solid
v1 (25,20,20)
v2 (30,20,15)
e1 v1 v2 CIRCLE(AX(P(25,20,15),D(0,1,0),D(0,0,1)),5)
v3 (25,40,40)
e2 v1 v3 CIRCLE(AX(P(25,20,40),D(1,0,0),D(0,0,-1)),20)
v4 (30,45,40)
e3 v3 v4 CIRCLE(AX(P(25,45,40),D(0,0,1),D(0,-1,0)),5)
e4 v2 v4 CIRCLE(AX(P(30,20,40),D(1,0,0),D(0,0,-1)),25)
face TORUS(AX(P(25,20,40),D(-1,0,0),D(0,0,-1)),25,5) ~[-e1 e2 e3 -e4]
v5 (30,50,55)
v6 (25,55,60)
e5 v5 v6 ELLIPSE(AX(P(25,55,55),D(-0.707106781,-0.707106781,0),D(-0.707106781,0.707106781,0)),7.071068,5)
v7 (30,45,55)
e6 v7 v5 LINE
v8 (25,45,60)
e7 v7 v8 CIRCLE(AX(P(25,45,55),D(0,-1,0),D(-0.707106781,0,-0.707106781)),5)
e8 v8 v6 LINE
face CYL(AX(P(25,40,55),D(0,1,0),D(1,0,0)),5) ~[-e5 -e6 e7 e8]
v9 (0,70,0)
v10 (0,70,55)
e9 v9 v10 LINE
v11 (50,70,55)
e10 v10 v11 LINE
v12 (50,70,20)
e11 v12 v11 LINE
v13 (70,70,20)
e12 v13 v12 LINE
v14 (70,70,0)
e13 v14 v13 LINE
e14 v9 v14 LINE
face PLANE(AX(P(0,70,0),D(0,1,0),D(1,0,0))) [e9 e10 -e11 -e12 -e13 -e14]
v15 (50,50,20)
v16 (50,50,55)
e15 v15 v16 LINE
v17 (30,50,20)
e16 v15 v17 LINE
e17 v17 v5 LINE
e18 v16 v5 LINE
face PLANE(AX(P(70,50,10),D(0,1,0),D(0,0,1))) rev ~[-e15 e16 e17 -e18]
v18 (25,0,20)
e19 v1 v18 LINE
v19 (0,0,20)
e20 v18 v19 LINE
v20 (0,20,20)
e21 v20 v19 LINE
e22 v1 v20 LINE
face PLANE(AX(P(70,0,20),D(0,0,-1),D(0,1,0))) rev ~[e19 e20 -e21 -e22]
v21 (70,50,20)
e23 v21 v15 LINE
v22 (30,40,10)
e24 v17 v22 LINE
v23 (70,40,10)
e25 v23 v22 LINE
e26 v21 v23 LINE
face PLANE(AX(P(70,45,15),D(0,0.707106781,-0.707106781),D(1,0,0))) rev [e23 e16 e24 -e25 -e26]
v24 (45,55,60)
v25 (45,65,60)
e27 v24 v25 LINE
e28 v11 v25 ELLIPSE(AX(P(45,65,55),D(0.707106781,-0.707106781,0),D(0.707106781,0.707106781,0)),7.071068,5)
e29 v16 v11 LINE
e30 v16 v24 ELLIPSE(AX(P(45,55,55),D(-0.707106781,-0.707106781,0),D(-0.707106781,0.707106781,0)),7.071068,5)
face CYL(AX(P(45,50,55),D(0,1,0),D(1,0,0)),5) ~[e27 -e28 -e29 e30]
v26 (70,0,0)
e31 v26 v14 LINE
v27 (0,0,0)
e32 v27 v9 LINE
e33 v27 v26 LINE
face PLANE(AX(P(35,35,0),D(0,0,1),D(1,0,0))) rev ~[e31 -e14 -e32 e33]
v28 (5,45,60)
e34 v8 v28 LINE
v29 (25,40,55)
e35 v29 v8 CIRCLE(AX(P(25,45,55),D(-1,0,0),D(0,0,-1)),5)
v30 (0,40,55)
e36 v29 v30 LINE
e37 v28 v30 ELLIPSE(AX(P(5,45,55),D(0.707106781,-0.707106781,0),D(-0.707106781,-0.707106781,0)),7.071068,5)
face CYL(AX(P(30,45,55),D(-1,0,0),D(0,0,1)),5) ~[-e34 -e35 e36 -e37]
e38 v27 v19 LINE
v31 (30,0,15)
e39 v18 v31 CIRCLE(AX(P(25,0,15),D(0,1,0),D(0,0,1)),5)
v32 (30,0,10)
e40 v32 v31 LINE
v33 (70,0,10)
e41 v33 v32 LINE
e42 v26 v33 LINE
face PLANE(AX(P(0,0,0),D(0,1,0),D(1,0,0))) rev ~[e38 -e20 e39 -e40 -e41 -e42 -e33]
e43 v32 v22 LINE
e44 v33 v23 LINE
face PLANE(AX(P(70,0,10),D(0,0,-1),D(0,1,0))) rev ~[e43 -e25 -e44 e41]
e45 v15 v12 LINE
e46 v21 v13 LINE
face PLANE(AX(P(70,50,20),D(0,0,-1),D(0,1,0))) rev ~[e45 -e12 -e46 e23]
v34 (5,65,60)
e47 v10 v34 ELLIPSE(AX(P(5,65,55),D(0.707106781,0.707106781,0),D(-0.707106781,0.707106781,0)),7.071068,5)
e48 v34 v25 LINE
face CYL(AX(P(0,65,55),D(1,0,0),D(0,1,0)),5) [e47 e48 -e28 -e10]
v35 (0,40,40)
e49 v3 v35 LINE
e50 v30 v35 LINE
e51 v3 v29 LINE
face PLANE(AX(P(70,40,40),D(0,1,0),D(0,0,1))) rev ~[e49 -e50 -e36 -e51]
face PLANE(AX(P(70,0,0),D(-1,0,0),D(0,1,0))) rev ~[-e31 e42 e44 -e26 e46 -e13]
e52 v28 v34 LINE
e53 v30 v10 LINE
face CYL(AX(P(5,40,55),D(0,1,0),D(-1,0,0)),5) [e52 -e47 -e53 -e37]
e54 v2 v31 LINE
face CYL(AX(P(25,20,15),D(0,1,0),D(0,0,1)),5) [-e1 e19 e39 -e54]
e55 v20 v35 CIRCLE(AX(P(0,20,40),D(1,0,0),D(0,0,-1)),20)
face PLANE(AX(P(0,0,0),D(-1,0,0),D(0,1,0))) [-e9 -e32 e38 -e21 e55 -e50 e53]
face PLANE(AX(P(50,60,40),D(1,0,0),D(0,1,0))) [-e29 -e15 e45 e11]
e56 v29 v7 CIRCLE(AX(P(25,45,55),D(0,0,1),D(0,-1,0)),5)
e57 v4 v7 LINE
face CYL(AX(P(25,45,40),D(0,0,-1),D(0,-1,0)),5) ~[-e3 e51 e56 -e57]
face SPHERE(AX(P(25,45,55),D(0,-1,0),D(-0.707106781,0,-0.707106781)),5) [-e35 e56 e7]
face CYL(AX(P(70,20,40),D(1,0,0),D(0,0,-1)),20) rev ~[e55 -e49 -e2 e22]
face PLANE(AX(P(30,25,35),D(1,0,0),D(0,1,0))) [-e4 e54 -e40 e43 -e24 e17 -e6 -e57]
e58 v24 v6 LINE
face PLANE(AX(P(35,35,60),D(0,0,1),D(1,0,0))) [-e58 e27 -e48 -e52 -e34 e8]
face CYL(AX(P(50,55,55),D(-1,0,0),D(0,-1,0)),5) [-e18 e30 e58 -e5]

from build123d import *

# Parameters (mm, degrees)
F0_W          = 70
F0_H          = 70
F1_DEPTH      = 60
F3_DEPTH      = 70.001
F4_W          = 50
F4_H          = 50
F5_DEPTH      = 40
F6_SIZE       = 10
F7_W          = 20
F7_H          = 40
F8_DEPTH      = 20
F9_R          = 5
F10_T1_DEPTH  = 32.5
F10_T3_DEPTH  = 15
F10_S7_W      = 5
F10_S7_H      = 5
F10_T8_DEPTH  = 5
F10_T12_ANGLE = 90


# Not quite as in the source:
# - a fillet or chamfer that OpenCascade refuses, or shapes differently, is made with other operations: its cross-section is extruded or revolved along the edge and cut away or added


with BuildPart() as f1:
    # F0 (on Top) → F1 (new body)
    with BuildSketch(Plane.XY):
        with Locations((35, 35)):
            Rectangle(F0_W, F0_H)
    extrude(amount=F1_DEPTH)

    # F2 (on face) → F3 (cut, through all)
    with BuildSketch(Plane.YZ.offset(70)):
        with BuildLine():
            Line((40, 60), (0, 60))
            Line((0, 60), (0, 20))
            Line((0, 20), (20, 20))
            ThreePointArc((20, 20), (34.1421356237, 25.8578643763), (40, 40))
            Line((40, 40), (40, 60))
        make_face()
    extrude(amount=-F3_DEPTH, mode=Mode.SUBTRACT)

    # F4 (on face) → F5 (cut)
    with BuildSketch(Plane.YZ.offset(70)):
        with Locations((25, 35)):
            Rectangle(F4_W, F4_H)
    extrude(amount=-F5_DEPTH, mode=Mode.SUBTRACT)

    # F6
    f6_edges = [f1.edges().sort_by_distance(p)[0] for p in [
        (50, 50, 10),
    ]]
    chamfer(f6_edges, length=F6_SIZE)

    # F7 (on face) → F8 (cut)
    with BuildSketch(Plane.YZ.offset(70)):
        with Locations((60, 40)):
            Rectangle(F7_W, F7_H)
    extrude(amount=-F8_DEPTH, mode=Mode.SUBTRACT)

    # F9
    f9_edges = [f1.edges().sort_by_distance(p)[0] for p in [
        (40, 50, 60),
        (30, 45, 60),
        (15, 40, 60),
        (0, 55, 60),
        (25, 70, 60),
        (50, 60, 60),
    ]]
    fillet(f9_edges, radius=F9_R)

    # F10: fillet of radius 5 on 1 edges, made by hand

    # F10_s2 → F10_t1 (cut)
    with BuildSketch(Plane.XZ.offset(-20)):
        with BuildLine():
            ThreePointArc((25, 20), (28.5355339059, 18.5355339059), (30, 15))
            Line((30, 15), (30, 20))
            Line((30, 20), (25, 20))
        make_face()
    extrude(amount=F10_T1_DEPTH, mode=Mode.SUBTRACT)

    # F10_s4 → F10_t3 (cut)
    with BuildSketch(Plane.XY.offset(40)):
        with BuildLine():
            ThreePointArc((25, 40), (28.5355339059, 41.4644660941), (30, 45))
            Line((30, 45), (30, 40))
            Line((30, 40), (25, 40))
        make_face()
    extrude(amount=F10_T3_DEPTH, mode=Mode.SUBTRACT)


with BuildPart() as f10_tool6:
    # F10_s7 → F10_t8 (new body)
    with BuildSketch(Plane.XZ.offset(-45)):
        with Locations((27.5, 57.5)):
            Rectangle(F10_S7_W, F10_S7_H)
    extrude(amount=F10_T8_DEPTH)

    # F10_s9 → F10_t10 (revolve, cut)
    with BuildSketch(Plane(origin=(25, 45, 55), x_dir=(-0.7071067812, 0, -0.7071067812), z_dir=(-0.7071067812, 0, 0.7071067812))):
        with BuildLine():
            ThreePointArc((0, -5), (5, 0), (0, 5))
            Line((0, 5), (0, -5))
        make_face()
    revolve(axis=Axis((25, 45, 55), (0, -1, 0)), mode=Mode.SUBTRACT)


with BuildPart() as f1_1:
    add(f1.part)

    # F10_t5: cut F10_tool6
    add(f10_tool6.part, mode=Mode.SUBTRACT)

    # F10_s11 → F10_t12 (revolve, cut)
    with BuildSketch(Plane.XZ.offset(-20)):
        with BuildLine():
            ThreePointArc((25, 20), (28.5355339059, 18.5355339059), (30, 15))
            Line((30, 15), (30, 20))
            Line((30, 20), (25, 20))
        make_face()
    revolve(axis=Axis((30, 20, 40), (1, 0, 0)), revolution_arc=F10_T12_ANGLE, mode=Mode.SUBTRACT)


solid = f1_1.part
